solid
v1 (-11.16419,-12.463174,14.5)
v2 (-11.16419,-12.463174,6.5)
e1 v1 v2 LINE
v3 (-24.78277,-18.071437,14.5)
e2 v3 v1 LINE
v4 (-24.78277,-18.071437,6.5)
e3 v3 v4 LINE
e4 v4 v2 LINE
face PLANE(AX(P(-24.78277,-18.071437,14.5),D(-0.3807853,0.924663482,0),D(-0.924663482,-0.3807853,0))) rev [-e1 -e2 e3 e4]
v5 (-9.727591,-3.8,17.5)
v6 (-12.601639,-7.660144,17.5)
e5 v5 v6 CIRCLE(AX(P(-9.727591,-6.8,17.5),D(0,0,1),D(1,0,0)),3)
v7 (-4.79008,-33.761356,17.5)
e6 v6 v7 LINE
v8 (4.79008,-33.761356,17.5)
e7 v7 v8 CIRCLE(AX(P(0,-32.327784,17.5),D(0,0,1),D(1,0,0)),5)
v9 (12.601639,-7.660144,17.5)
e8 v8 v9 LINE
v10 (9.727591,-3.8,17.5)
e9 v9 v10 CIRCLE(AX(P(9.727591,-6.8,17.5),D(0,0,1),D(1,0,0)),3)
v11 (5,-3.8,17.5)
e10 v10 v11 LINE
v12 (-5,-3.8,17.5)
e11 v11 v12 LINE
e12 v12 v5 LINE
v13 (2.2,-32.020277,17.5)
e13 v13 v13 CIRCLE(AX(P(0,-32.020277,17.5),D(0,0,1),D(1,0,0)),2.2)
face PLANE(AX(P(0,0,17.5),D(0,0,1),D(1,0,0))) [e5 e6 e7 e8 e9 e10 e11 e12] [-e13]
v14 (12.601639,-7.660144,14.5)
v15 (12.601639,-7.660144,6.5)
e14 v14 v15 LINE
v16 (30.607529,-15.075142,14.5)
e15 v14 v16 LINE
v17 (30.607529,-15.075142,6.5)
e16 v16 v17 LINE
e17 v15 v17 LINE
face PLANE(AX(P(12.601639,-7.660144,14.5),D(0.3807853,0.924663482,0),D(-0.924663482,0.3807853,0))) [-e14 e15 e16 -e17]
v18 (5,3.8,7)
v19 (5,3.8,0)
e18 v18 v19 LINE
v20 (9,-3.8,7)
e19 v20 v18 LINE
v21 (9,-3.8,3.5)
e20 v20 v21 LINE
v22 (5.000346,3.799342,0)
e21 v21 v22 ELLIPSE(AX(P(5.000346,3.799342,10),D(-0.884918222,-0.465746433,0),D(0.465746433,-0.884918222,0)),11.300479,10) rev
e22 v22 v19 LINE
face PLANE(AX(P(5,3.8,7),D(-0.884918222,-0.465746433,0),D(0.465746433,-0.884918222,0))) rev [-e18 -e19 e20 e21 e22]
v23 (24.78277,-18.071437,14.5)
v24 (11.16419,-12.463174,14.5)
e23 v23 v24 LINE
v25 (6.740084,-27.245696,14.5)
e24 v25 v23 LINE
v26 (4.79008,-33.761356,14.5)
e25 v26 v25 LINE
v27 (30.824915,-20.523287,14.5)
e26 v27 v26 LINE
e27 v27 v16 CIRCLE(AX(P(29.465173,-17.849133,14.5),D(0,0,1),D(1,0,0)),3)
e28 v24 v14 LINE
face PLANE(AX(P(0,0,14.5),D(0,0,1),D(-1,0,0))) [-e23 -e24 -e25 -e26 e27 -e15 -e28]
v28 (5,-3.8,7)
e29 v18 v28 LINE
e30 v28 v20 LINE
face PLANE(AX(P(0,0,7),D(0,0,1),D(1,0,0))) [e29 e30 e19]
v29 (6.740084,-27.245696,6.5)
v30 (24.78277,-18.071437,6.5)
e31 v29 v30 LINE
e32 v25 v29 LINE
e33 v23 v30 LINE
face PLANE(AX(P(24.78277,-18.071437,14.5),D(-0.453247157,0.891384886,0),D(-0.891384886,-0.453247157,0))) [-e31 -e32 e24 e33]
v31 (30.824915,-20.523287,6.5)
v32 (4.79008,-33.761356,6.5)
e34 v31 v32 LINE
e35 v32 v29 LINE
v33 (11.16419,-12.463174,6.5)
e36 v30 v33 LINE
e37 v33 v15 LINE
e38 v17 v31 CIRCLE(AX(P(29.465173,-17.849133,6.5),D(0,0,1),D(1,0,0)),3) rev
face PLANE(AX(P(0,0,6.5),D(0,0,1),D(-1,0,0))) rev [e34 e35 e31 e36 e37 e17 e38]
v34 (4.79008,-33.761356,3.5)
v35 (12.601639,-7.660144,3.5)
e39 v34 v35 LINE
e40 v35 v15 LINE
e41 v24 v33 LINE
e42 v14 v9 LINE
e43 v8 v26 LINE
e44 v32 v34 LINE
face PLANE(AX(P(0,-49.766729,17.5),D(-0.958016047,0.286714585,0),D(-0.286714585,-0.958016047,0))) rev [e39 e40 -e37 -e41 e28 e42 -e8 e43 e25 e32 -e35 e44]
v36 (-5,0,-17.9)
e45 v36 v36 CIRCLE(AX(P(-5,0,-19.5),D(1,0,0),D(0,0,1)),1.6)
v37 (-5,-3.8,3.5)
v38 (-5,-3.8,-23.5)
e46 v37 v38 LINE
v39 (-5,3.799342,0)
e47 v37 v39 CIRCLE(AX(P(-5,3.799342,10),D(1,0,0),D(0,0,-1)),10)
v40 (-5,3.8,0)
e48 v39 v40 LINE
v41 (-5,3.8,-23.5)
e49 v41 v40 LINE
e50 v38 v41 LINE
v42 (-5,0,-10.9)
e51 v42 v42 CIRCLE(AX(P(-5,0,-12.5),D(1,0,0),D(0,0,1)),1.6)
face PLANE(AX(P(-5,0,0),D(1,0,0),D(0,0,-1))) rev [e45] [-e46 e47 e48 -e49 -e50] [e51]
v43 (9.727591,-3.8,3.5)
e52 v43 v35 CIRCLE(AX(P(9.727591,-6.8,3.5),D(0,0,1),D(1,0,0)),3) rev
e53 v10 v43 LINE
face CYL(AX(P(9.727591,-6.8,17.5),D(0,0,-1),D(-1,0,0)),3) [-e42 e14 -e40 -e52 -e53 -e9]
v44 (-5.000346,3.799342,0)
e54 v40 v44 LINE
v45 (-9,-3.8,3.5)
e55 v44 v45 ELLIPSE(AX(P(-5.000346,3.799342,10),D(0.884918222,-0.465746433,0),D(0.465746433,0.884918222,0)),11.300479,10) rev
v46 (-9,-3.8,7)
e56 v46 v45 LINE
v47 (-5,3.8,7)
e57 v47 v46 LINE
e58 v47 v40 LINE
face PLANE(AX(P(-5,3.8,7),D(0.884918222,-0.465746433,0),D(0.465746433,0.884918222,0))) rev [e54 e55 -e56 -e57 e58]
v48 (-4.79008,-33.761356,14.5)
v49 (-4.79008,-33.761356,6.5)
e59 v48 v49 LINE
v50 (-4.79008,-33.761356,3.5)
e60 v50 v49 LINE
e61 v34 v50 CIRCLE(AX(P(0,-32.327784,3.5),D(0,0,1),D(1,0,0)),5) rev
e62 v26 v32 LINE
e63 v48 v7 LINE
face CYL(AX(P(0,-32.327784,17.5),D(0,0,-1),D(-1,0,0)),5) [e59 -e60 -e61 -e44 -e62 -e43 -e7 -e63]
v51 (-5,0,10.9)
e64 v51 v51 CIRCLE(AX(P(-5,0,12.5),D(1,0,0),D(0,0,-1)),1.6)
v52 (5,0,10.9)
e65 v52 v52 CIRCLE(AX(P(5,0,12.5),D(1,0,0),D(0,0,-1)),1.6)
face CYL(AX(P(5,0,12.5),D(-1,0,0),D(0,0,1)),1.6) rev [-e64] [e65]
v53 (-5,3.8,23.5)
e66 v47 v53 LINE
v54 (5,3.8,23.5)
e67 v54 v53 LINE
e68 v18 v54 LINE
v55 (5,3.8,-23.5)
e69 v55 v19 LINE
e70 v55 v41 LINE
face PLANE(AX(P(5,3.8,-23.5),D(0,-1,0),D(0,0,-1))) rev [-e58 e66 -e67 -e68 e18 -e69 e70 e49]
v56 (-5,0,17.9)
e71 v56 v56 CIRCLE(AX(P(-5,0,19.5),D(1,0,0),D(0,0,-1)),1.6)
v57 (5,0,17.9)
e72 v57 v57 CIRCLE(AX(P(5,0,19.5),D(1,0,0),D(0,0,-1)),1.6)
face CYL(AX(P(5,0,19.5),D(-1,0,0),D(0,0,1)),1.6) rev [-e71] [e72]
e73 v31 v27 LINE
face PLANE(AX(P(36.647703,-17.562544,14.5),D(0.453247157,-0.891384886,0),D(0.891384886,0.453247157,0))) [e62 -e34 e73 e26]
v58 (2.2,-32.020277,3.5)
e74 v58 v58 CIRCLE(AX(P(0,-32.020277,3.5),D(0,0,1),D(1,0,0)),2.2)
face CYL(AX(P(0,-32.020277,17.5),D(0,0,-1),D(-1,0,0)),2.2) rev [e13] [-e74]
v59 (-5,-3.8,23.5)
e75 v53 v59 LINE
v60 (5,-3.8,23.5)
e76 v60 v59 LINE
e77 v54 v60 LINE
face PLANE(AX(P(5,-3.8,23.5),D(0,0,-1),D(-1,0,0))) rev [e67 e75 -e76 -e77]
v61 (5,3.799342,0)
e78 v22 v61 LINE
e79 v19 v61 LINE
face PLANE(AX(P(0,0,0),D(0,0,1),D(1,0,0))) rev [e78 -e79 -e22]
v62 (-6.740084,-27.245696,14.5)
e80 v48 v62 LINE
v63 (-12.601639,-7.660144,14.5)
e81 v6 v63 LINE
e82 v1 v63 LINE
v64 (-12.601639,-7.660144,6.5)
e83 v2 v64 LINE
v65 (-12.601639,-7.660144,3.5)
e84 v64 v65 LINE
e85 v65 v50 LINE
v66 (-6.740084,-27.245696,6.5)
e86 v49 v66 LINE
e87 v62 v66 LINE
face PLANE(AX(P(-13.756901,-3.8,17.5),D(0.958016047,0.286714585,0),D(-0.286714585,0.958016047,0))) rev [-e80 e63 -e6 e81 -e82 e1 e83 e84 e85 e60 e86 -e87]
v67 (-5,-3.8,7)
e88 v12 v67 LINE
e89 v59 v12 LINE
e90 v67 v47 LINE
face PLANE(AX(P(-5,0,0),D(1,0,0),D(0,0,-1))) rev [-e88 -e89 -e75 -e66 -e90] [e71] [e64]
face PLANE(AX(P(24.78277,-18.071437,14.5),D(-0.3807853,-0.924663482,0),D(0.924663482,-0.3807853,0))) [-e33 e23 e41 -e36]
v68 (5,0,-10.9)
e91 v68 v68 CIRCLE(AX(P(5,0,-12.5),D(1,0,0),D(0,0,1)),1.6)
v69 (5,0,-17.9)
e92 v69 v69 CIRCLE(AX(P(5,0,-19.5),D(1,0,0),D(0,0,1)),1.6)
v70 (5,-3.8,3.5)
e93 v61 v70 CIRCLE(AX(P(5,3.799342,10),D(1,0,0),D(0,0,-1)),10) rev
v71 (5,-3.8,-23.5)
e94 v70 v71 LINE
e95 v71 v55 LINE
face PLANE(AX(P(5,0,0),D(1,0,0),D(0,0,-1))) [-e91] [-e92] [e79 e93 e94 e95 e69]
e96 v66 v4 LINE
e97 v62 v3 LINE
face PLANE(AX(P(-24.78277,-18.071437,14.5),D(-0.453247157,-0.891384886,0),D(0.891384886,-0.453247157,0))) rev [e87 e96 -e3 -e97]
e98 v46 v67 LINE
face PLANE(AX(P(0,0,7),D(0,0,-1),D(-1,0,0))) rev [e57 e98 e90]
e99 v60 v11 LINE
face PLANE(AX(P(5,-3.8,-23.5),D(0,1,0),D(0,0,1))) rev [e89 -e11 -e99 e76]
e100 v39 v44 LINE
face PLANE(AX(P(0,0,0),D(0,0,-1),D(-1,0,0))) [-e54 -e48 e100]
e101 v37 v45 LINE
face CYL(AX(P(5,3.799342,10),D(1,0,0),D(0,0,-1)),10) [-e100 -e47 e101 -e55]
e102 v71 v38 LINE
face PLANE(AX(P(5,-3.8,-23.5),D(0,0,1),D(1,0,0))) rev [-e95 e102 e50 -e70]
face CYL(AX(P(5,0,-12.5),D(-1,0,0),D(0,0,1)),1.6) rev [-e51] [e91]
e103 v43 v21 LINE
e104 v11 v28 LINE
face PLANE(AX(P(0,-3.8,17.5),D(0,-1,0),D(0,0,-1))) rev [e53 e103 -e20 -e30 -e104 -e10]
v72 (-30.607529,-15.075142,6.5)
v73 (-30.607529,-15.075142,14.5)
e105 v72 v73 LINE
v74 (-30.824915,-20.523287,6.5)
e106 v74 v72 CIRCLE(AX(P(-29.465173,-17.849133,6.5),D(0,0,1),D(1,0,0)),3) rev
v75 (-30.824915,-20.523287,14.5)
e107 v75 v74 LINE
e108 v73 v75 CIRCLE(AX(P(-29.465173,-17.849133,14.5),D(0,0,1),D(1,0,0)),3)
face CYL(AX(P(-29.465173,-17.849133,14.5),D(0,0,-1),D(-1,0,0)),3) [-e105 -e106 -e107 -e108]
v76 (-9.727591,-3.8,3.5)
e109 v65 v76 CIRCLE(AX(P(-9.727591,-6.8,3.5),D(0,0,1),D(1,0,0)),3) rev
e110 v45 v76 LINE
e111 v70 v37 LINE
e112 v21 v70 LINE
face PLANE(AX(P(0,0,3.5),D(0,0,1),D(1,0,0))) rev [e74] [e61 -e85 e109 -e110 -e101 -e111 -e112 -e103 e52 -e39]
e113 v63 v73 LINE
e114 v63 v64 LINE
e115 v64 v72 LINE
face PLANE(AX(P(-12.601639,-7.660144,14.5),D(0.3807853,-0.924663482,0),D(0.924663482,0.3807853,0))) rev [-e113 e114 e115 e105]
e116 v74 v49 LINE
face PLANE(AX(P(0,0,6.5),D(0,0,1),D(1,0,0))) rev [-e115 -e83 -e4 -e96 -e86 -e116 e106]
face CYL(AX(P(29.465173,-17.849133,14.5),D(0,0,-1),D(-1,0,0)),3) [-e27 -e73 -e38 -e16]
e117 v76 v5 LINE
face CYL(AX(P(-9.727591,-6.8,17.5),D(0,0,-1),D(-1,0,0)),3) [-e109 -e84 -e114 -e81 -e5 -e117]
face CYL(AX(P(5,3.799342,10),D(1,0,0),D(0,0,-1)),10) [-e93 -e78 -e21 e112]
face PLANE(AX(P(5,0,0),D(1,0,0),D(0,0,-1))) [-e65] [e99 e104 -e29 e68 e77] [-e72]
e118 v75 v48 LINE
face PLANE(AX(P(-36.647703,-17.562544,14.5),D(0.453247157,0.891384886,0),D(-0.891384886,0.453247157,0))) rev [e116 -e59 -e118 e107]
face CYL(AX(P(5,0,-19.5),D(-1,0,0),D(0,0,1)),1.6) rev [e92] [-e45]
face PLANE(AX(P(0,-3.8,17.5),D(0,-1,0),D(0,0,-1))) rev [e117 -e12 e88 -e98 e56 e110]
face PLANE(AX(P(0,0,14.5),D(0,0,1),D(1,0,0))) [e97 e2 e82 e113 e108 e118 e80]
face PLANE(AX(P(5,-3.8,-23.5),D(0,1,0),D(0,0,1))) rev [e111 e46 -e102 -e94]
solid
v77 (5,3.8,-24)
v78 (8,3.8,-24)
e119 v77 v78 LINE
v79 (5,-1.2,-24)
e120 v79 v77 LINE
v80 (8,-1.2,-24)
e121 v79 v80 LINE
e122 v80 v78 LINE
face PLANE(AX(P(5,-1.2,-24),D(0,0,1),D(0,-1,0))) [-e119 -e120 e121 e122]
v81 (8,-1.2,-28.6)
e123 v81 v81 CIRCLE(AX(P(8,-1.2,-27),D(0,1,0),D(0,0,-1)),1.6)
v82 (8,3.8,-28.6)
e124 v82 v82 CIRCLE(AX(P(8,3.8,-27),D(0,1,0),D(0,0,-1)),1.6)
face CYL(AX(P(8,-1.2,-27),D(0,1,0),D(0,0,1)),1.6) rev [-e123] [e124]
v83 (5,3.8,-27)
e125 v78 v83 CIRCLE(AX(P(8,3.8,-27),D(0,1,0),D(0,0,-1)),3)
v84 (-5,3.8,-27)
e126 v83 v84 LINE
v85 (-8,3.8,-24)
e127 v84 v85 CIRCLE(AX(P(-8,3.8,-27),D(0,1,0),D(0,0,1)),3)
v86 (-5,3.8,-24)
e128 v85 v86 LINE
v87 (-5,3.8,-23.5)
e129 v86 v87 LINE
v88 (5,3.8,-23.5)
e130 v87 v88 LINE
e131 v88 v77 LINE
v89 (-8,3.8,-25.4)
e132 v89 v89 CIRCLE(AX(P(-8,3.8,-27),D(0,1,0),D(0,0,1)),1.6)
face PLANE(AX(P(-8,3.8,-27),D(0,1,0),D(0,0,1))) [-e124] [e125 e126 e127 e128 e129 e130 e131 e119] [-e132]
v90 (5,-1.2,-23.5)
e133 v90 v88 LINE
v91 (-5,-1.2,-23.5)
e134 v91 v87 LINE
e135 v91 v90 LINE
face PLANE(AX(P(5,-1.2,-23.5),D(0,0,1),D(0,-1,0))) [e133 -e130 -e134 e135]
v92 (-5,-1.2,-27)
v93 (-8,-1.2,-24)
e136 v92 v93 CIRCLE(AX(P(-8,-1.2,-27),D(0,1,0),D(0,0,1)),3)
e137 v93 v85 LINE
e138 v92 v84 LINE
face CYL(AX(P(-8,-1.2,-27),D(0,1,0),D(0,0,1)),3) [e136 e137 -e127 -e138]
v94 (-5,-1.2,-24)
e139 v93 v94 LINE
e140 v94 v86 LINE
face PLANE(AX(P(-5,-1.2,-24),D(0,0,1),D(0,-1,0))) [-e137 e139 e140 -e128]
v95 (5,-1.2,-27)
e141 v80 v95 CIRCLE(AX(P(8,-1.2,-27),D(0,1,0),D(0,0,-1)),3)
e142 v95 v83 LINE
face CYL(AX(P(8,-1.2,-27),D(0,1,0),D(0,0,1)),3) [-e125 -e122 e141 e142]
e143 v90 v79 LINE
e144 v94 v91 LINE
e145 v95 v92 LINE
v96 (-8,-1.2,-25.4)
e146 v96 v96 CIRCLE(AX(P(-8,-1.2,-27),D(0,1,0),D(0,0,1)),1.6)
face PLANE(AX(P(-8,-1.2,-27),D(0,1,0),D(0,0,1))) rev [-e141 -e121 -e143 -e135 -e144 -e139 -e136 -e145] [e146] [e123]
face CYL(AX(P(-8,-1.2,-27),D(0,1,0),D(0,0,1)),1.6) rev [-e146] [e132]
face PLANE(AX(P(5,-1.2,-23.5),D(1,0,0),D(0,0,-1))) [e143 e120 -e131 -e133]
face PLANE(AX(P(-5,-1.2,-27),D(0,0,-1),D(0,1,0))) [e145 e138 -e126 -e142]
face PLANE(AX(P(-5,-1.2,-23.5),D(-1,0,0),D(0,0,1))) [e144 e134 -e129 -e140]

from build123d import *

# Parameters (mm, degrees)
SKETCH_1_W             = 47
SKETCH_1_H             = 7.6
SKETCH_1_R             = 1.6
EXTRUDE_1_DEPTH        = 5
EXTRUDE_3_DEPTH        = 7
SKETCH_3_R             = 2.2
EXTRUDE_2_DEPTH        = 7
FILLET_1_R             = 5
FILLET_2_R             = 3
FILLET_4_R             = 10
EXTRUDE_4_DEPTH        = 4
FILLET_3_R             = 3
FILLET_3_OF_MIRROR_1_R = 3
SKETCH_6_R             = 1.6
EXTRUDE_5_DEPTH        = 5


with BuildPart() as part:
    # 草图1 → 凸台-拉伸1 (new, symmetric)
    with BuildSketch(Plane(origin=(0, 0, 0), x_dir=(0, 0, -1), z_dir=(1, 0, 0))):
        Rectangle(SKETCH_1_W, SKETCH_1_H)
        with Locations((-19.5, 0)):
            Circle(SKETCH_1_R, mode=Mode.SUBTRACT)
        with Locations((-12.5, 0)):
            Circle(SKETCH_1_R, mode=Mode.SUBTRACT)
        with Locations(Location((12.5, 0, 0), (0, 0, 180))):
            Circle(SKETCH_1_R, mode=Mode.SUBTRACT)
        with Locations(Location((19.5, 0, 0), (0, 0, 180))):
            Circle(SKETCH_1_R, mode=Mode.SUBTRACT)
    extrude(amount=EXTRUDE_1_DEPTH, both=True)

    # 草图4 → 凸台-拉伸3 (add)
    with BuildSketch(Plane.XY):
        Polygon((5, 3.8), (5, -3.8), (9, -3.8), align=None)
        Polygon((-5, -3.8), (-9, -3.8), (-5, 3.8), align=None)
    extrude(amount=EXTRUDE_3_DEPTH)

    # 草图3 → 凸台-拉伸2 (add, symmetric)
    with BuildSketch(Plane.XY.offset(10.5)):
        Polygon((0, -3.8), (-13.756900678, -3.8), (0, -49.766728974), (13.756900678, -3.8), align=None)
        with Locations((0, -32.020277262)):
            Circle(SKETCH_3_R, mode=Mode.SUBTRACT)
    extrude(amount=EXTRUDE_2_DEPTH, both=True)

    # 圆角1
    fillet_1_edges = [part.edges().sort_by_distance(p)[0] for p in [
        (0, -49.766728974, 10.5),
    ]]
    fillet(fillet_1_edges, radius=FILLET_1_R)

    # 圆角2
    fillet_2_edges = [part.edges().sort_by_distance(p)[0] for p in [
        (13.756900678, -3.8, 10.5),
        (-13.756900678, -3.8, 10.5),
    ]]
    fillet(fillet_2_edges, radius=FILLET_2_R)

    # 圆角4
    # the kernel refuses this fillet: 10 mm, written as the material it takes off along each edge
    with BuildSketch(Plane(origin=(13.998355192, -3.8, 0), x_dir=(0, 0, 1), z_dir=(-1, 0, 0))) as fillet_4_piece_1_section:
        with BuildLine():
            CenterArc((10, 7.599342077), FILLET_4_R, 180, 49.458398126)
            Line((0, 7.599342077), (-0.2, 7.599342077))
            Line((-0.2, 7.599342077), (-0.2, 0))
            Line((-0.2, 0), (0, -0.2))
            ThreePointArc((0, -0.2), (1.75, -0.2), (3.37, -0.151986842))
            Line((3.37, -0.151986842), (3.5, 0))
        make_face()
    fillet_4_piece_1 = extrude(amount=41.996710384, mode=Mode.PRIVATE)
    fillet_4_piece_1 = split(fillet_4_piece_1, bisect_by=Plane(origin=(5, -1.809246977, 0.883967922), z_dir=(1, 0, 0)), keep=Keep.TOP, mode=Mode.PRIVATE)
    add(fillet_4_piece_1, mode=Mode.SUBTRACT)
    with BuildSketch(Plane(origin=(-5, -3.8, 0), x_dir=(0, 0, 1), z_dir=(-1, 0, 0))) as fillet_4_piece_2:
        with BuildLine():
            CenterArc((10, 7.599342077), FILLET_4_R, 180, 49.458398126)
            Line((0, 7.599342077), (-0.2, 7.599342077))
            Line((-0.2, 7.599342077), (-0.2, 0))
            Line((-0.2, 0), (0, -0.2))
            ThreePointArc((0, -0.2), (1.75, -0.2), (3.37, -0.151986842))
            Line((3.37, -0.151986842), (3.5, 0))
        make_face()
    extrude(amount=22.998355192, mode=Mode.SUBTRACT)
    with BuildSketch(Plane(origin=(-13.998355192, -3.8, 0), x_dir=(0, 0, 1), z_dir=(1, 0, 0))) as fillet_4_piece_3_section:
        with BuildLine():
            CenterArc((10, -7.599342077), FILLET_4_R, 130.541601874, 49.458398126)
            Line((0, -7.599342077), (-0.2, -7.599342077))
            Line((-0.2, -7.599342077), (-0.2, 0))
            Line((-0.2, 0), (0, 0.2))
            ThreePointArc((0, 0.2), (1.75, 0.2), (3.37, 0.151986842))
            Line((3.37, 0.151986842), (3.5, 0))
        make_face()
    fillet_4_piece_3 = extrude(amount=41.996710384, mode=Mode.PRIVATE)
    fillet_4_piece_3 = split(fillet_4_piece_3, bisect_by=Plane(origin=(-5, -1.809246977, 0.883967922), z_dir=(-1, 0, 0)), keep=Keep.TOP, mode=Mode.PRIVATE)
    add(fillet_4_piece_3, mode=Mode.SUBTRACT)
    with BuildSketch(Plane(origin=(5, -3.8, 0), x_dir=(0, 0, 1), z_dir=(1, 0, 0))) as fillet_4_piece_4:
        with BuildLine():
            CenterArc((10, -7.599342077), FILLET_4_R, 130.541601874, 49.458398126)
            Line((0, -7.599342077), (-0.2, -7.599342077))
            Line((-0.2, -7.599342077), (-0.2, 0))
            Line((-0.2, 0), (0, 0.2))
            ThreePointArc((0, 0.2), (1.75, 0.2), (3.37, 0.151986842))
            Line((3.37, 0.151986842), (3.5, 0))
        make_face()
    extrude(amount=22.998355192, mode=Mode.SUBTRACT)

    # 草图5 → 凸台-拉伸4 (add, symmetric)
    with BuildSketch(Plane.XY.offset(10.5)):
        Polygon((-12.6016387, -7.660143754), (-36.64770265, -17.562543764), (-4.790080237, -33.761356459), (-6.740083912, -27.245696244), (-24.782770498, -18.071436573), (-11.164189994, -12.463174365), align=None)
    extrude_4 = extrude(amount=EXTRUDE_4_DEPTH, both=True)

    # 圆角3
    fillet_3_edges = [part.edges().sort_by_distance(p)[0] for p in [
        (-36.64770265, -17.562543764, 10.5),
    ]]
    fillet(fillet_3_edges, radius=FILLET_3_R)

    # 镜向1: 凸台-拉伸4 across plane
    add(extrude_4.mirror(Plane(origin=(0, 0, 0), x_dir=(0, 0, 1), z_dir=(1, 0, 0))))

    # 圆角3 of 镜向1
    fillet_3_of_mirror_1_edges = [part.edges().sort_by_distance(p)[0] for p in [
        (36.64770265, -17.562543764, 10.5),
    ]]
    fillet(fillet_3_of_mirror_1_edges, radius=FILLET_3_OF_MIRROR_1_R)


with BuildPart() as body_2:
    # 草图6 → 凸台-拉伸5 (new body)
    with BuildSketch(Plane(origin=(0, 3.8, 0), x_dir=(1, 0, 0), z_dir=(0, 1, 0))):
        with BuildLine():
            Line((-5, 23.5), (-5, 24))
            Line((-5, 24), (-8, 24))
            ThreePointArc((-8, 24), (-10.121320344, 29.121320344), (-5, 27))
            Line((-5, 27), (5, 27))
            ThreePointArc((5, 27), (10.121320344, 29.121320344), (8, 24))
            Line((8, 24), (5, 24))
            Line((5, 24), (5, 23.5))
            Line((5, 23.5), (-5, 23.5))
        make_face()
        with Locations(Location((-8, 27, 0), (0, 0, 270))):
            Circle(SKETCH_6_R, mode=Mode.SUBTRACT)
        with Locations(Location((8, 27, 0), (0, 0, 90))):
            Circle(SKETCH_6_R, mode=Mode.SUBTRACT)
    extrude(amount=-EXTRUDE_5_DEPTH)


solid = Compound([part.part, body_2.part])
